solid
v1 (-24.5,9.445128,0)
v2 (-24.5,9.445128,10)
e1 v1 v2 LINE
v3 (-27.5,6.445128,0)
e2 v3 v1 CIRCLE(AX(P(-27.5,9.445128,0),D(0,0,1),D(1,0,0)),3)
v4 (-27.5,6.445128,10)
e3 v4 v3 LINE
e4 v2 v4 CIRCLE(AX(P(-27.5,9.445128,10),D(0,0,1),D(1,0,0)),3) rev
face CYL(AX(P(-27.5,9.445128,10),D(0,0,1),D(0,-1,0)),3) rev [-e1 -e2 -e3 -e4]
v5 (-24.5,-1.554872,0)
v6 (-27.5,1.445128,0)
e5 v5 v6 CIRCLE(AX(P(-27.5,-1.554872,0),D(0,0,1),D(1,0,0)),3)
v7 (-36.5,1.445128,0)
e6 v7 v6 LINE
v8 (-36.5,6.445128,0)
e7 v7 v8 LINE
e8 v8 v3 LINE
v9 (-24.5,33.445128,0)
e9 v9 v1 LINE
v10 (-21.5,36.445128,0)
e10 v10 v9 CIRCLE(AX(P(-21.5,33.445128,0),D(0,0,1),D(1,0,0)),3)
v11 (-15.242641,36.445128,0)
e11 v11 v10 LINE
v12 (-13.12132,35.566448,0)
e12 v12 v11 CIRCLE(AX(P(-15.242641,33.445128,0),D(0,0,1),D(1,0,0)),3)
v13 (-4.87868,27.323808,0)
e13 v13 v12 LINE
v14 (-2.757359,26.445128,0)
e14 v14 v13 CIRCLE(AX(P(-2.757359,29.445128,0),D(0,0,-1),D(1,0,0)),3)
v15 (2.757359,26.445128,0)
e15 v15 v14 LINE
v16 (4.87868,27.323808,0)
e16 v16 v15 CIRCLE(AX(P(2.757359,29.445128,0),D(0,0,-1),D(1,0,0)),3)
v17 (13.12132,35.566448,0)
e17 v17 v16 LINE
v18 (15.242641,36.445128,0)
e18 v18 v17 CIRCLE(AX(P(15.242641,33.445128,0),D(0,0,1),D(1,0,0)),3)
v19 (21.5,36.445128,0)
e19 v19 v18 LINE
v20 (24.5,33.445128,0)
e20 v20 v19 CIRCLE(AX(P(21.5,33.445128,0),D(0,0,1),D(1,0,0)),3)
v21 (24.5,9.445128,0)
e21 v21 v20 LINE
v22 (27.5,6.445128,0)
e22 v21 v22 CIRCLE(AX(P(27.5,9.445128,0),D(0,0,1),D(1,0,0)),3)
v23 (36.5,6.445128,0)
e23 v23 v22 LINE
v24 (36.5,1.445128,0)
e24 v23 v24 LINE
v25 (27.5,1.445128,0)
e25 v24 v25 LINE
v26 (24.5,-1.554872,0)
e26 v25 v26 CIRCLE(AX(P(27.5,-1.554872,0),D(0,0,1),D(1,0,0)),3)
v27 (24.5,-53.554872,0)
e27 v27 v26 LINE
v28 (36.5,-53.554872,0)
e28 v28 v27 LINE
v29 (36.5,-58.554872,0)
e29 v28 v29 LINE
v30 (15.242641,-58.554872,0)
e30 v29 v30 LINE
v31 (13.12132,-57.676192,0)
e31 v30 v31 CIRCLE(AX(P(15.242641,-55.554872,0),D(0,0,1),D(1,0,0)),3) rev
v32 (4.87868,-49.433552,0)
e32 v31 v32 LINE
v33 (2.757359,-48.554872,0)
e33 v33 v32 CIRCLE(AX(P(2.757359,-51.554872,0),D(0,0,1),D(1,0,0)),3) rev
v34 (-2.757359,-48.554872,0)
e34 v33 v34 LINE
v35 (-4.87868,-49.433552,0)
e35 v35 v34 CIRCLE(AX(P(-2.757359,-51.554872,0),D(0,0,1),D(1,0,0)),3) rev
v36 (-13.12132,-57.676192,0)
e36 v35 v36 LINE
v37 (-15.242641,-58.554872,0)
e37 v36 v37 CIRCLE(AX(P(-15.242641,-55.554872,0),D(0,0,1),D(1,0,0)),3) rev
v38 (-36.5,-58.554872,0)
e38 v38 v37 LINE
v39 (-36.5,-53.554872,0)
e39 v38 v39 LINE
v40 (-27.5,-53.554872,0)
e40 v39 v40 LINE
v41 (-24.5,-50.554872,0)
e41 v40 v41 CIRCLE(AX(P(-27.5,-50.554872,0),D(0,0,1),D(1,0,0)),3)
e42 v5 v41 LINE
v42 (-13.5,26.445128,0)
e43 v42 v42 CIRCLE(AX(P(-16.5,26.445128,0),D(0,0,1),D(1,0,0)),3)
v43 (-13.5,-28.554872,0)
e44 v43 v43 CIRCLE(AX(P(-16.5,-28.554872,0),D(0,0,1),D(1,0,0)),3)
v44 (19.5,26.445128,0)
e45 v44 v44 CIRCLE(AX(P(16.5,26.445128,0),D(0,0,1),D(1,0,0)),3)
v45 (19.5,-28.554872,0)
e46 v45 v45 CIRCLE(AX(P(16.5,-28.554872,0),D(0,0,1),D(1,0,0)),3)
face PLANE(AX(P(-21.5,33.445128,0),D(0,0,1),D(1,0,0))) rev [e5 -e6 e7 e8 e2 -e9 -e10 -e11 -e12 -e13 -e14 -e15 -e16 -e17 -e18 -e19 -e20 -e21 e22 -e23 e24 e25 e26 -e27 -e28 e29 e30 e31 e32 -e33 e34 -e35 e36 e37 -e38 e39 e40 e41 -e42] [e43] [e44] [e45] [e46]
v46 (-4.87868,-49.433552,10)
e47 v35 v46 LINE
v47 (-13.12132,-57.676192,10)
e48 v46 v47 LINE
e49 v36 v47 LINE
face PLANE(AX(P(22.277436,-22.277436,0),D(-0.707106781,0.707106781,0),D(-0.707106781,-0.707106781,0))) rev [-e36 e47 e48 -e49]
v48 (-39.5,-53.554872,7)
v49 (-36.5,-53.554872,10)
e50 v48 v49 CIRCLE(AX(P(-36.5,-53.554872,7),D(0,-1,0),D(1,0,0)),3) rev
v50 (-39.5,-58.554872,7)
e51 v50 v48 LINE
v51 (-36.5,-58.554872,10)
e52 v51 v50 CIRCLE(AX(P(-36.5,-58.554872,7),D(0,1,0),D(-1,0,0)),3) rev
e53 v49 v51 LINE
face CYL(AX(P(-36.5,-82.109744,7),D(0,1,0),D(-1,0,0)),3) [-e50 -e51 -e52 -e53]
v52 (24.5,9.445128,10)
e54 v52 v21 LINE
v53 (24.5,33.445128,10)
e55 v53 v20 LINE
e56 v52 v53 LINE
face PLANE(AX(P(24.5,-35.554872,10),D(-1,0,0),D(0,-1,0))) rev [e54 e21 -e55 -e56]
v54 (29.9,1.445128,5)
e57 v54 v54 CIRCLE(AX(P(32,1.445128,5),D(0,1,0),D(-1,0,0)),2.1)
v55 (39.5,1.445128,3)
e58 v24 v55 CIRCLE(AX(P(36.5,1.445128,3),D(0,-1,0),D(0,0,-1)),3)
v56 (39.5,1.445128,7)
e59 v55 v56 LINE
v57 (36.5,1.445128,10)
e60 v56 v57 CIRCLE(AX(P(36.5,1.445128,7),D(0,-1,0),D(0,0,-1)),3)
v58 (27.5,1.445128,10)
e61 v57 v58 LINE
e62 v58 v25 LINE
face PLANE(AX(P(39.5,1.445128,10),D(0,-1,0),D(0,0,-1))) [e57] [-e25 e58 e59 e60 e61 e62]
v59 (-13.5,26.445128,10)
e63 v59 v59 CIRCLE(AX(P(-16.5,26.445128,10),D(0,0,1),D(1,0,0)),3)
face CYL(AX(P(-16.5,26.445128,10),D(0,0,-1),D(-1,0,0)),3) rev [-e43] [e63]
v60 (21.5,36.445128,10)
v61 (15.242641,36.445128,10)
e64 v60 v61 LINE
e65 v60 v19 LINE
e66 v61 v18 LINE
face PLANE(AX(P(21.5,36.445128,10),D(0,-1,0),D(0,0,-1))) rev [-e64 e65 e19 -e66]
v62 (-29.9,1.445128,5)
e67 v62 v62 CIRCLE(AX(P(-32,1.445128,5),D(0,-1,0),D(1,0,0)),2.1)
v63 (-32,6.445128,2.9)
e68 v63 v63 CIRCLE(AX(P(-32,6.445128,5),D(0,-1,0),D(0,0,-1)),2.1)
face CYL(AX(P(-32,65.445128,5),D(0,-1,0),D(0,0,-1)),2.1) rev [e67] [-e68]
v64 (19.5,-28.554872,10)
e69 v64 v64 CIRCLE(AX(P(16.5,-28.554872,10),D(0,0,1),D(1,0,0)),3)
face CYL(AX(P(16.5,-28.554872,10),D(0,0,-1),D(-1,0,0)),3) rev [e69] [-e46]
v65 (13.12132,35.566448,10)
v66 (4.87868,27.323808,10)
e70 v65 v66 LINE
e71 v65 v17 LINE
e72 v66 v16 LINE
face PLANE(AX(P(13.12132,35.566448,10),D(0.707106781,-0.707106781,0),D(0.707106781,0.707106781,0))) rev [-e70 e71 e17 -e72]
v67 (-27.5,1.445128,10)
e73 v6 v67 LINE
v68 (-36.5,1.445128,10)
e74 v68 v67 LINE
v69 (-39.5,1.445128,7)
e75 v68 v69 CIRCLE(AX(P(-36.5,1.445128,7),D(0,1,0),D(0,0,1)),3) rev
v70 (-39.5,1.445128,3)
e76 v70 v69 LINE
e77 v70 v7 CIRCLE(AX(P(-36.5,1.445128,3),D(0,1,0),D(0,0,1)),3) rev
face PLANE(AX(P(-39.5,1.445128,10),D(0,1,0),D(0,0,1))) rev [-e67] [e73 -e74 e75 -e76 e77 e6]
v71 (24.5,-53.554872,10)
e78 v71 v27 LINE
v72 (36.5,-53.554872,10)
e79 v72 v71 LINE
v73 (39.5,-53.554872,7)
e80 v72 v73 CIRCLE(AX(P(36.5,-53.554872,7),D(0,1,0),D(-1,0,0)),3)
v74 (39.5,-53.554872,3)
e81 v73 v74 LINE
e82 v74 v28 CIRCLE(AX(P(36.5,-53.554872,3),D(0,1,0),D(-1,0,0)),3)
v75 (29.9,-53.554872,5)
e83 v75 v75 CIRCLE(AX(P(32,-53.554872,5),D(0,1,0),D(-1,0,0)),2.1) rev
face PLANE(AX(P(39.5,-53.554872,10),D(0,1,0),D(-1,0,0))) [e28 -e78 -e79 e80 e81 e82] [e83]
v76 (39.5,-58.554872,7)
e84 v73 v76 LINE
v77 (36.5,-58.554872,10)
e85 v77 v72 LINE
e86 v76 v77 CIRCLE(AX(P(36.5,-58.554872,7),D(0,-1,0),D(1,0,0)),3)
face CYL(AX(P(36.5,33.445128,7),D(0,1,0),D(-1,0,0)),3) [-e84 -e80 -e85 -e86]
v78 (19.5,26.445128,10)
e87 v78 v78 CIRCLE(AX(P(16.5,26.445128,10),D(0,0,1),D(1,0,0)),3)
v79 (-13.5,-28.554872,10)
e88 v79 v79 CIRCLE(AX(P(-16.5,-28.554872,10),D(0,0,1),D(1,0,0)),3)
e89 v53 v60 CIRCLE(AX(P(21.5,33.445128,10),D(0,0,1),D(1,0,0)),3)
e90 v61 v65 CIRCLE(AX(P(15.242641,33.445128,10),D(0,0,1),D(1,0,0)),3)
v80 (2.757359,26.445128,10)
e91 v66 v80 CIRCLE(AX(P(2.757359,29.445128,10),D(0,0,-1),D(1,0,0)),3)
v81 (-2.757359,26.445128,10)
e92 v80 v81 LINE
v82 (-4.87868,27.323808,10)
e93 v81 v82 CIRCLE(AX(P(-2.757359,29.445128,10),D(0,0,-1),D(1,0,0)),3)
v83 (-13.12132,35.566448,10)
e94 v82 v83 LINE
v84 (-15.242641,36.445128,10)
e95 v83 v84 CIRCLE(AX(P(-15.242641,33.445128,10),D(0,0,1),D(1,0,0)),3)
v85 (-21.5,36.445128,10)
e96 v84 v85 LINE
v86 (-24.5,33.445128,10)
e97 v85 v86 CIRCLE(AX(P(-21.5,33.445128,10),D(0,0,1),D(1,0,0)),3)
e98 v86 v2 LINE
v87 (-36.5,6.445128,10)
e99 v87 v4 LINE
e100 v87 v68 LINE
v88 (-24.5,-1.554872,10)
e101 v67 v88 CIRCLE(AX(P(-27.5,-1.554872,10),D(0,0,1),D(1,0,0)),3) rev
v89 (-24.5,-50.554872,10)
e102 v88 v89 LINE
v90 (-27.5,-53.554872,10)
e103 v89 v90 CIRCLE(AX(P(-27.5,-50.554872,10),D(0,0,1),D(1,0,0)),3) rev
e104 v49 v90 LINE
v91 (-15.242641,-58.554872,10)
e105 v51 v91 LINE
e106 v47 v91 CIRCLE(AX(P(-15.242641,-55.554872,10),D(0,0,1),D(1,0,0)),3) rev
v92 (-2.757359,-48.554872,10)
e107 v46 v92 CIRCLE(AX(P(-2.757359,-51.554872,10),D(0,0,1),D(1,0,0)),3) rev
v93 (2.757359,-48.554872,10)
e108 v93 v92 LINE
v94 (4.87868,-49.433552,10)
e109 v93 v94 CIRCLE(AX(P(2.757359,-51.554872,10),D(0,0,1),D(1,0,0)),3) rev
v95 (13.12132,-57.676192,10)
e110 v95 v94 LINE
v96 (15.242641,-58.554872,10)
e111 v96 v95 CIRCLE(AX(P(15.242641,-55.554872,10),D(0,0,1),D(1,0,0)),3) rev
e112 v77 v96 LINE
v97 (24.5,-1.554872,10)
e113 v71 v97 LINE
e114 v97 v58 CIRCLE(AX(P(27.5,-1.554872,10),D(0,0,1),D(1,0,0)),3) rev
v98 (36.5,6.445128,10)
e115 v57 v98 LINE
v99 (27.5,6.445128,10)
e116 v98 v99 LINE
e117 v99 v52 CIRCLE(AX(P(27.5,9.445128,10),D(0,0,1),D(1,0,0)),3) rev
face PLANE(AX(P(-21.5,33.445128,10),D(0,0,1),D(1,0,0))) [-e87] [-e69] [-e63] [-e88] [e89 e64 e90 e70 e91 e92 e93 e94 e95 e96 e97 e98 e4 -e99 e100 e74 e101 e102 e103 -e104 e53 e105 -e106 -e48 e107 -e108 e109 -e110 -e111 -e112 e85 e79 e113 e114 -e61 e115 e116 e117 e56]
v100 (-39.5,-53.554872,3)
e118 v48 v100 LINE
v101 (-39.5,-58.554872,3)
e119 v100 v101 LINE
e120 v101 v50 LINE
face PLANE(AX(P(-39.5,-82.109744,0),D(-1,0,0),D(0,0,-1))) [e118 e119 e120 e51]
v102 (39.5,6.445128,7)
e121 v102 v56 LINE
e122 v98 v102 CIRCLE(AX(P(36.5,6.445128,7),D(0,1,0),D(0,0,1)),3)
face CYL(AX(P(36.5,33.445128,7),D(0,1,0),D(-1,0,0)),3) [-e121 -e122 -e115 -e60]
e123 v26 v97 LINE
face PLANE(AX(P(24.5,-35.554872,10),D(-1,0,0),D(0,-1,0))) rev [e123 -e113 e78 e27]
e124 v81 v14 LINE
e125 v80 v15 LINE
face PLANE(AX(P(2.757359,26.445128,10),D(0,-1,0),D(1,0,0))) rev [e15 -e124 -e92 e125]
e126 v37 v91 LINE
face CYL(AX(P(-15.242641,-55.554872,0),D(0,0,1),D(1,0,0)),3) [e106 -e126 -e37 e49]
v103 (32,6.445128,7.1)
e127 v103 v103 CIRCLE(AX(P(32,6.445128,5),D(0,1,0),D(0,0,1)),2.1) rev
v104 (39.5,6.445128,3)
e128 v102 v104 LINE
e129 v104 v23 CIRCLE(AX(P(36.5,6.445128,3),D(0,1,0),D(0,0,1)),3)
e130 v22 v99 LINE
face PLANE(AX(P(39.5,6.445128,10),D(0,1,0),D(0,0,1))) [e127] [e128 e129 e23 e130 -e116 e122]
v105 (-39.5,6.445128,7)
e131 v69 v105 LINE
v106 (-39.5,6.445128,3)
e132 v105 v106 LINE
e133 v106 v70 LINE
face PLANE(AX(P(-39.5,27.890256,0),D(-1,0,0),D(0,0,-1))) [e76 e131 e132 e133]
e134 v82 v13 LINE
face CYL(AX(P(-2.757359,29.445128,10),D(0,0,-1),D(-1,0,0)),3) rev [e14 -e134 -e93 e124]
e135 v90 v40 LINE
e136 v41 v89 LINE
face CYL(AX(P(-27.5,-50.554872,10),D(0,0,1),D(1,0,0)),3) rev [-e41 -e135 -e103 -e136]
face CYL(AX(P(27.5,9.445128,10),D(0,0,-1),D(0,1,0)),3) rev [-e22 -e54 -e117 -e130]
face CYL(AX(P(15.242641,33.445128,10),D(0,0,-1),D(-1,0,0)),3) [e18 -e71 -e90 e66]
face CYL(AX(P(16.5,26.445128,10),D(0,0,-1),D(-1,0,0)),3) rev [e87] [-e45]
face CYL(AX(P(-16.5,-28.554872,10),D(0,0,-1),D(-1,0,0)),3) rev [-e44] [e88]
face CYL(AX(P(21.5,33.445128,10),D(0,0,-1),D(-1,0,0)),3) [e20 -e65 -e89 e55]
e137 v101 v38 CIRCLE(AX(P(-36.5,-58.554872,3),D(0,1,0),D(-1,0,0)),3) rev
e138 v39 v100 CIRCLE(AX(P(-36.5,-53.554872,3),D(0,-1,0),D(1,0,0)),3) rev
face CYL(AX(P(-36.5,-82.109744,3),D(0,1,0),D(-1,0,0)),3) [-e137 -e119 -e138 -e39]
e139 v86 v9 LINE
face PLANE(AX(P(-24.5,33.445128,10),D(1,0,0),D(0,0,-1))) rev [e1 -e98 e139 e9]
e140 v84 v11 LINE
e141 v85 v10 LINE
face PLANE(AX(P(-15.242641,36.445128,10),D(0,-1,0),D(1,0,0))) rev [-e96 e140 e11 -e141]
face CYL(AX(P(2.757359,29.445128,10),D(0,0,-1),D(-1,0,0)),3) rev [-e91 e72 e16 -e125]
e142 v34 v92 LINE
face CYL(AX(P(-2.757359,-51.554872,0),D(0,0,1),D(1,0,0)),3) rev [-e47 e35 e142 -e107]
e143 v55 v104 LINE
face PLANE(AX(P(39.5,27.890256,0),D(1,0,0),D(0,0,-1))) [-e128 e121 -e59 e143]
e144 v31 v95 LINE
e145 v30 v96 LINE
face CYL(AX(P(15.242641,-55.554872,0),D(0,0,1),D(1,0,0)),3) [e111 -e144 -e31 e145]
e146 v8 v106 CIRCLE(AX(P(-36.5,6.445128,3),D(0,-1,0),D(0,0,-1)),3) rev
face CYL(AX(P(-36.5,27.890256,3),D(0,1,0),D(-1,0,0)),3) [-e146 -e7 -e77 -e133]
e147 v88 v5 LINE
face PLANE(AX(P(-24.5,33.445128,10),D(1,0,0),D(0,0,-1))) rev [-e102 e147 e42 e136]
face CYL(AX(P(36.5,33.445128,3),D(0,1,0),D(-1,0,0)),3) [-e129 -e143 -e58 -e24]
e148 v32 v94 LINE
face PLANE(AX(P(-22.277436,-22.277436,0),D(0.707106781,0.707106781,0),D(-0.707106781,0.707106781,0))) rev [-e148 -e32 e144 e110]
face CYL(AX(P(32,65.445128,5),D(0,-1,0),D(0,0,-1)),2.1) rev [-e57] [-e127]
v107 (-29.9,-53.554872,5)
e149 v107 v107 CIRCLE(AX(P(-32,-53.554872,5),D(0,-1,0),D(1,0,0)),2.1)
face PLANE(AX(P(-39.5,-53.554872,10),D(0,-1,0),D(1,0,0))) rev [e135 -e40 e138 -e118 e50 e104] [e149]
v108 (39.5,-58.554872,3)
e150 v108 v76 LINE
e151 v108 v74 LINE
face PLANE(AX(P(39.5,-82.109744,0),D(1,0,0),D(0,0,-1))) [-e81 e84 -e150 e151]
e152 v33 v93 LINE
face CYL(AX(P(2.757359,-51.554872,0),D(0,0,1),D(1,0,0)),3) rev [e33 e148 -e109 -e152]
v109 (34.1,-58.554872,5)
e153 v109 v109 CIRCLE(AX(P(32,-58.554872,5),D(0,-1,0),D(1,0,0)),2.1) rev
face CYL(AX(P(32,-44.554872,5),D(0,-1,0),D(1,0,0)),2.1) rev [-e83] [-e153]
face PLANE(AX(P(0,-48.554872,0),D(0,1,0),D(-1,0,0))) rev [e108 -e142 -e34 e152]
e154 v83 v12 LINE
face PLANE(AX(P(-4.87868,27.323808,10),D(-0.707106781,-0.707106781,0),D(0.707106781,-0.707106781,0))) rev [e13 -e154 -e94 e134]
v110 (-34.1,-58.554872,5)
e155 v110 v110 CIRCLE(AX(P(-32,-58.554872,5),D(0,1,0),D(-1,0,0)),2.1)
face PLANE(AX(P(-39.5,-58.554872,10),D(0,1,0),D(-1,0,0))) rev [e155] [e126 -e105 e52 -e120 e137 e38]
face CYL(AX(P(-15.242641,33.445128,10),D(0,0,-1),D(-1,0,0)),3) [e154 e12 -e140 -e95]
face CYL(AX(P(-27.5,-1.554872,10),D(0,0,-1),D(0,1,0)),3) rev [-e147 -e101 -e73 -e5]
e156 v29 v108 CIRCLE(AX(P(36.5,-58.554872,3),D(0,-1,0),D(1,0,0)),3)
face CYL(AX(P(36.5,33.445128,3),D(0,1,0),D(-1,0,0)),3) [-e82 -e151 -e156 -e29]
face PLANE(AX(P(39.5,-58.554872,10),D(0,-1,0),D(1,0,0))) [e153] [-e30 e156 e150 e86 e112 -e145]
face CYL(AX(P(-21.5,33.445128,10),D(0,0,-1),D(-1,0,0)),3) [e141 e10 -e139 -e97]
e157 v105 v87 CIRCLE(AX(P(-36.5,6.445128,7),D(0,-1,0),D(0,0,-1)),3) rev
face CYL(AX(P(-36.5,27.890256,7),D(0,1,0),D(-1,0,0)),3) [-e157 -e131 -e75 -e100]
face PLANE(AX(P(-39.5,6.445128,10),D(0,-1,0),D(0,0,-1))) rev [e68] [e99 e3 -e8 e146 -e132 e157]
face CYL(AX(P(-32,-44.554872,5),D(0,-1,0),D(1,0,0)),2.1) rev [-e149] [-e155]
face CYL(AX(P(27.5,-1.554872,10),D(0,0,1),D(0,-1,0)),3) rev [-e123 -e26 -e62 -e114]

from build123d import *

# Parameters (mm, degrees)
SKETCH1_R           = 3
BOSS_EXTRUDE1_DEPTH = 10
SKETCH2_W           = 10
SKETCH2_H           = 5
BOSS_EXTRUDE2_DEPTH = 15
SKETCH3_R           = 2.1
CUT_EXTRUDE1_DEPTH  = 64
FILLET1_R           = 3
BOSS_EXTRUDE3_START = -10
BOSS_EXTRUDE3_DEPTH = 10
MIRROR3_START       = -58.554872108
MIRROR3_OUTLINE_W   = 15
MIRROR3_OUTLINE_H   = 10
MIRROR3_OUTLINE_R   = 2.1
MIRROR3_DEPTH       = 5
MIRROR3_2_DEPTH     = 10
FILLET2_R           = 3
SKETCH5_W           = 15
SKETCH5_H           = 11
CUT_EXTRUDE2_DEPTH  = 80.749736613
FILLET3_R           = 3
MIRROR4_START       = 1.445127892
MIRROR4_OUTLINE_R   = 2.1
MIRROR4_DEPTH       = 5
MIRROR4_2_DEPTH     = 10
FILLET4_R           = 3
SKETCH6_W           = 15
SKETCH6_H           = 11
CUT_EXTRUDE3_DEPTH  = 80.749736613
CUT_EXTRUDE4_DEPTH  = 80.749736613


with BuildPart() as part:
    # Sketch1 → Boss-Extrude1 (new body)
    with BuildSketch(Plane.XY):
        with BuildLine():
            Line((-24.5, 33.445127892), (-24.5, -35.554872108))
            ThreePointArc((-24.5, -35.554872108), (-23.621320344, -37.676192452), (-21.5, -38.554872108))
            Line((-21.5, -38.554872108), (-15.242640687, -38.554872108))
            ThreePointArc((-15.242640687, -38.554872108), (-14.09459039, -38.326510706), (-13.121320344, -37.676192452))
            Line((-13.121320344, -37.676192452), (-4.878679656, -29.433551765))
            ThreePointArc((-4.878679656, -29.433551765), (-3.90540961, -28.783233511), (-2.757359313, -28.554872108))
            Line((-2.757359313, -28.554872108), (2.757359313, -28.554872108))
            ThreePointArc((2.757359313, -28.554872108), (3.90540961, -28.783233511), (4.878679656, -29.433551765))
            Line((4.878679656, -29.433551765), (13.121320344, -37.676192452))
            ThreePointArc((13.121320344, -37.676192452), (14.09459039, -38.326510706), (15.242640687, -38.554872108))
            Line((15.242640687, -38.554872108), (21.5, -38.554872108))
            ThreePointArc((21.5, -38.554872108), (23.621320344, -37.676192452), (24.5, -35.554872108))
            Line((24.5, -35.554872108), (24.5, 33.445127892))
            ThreePointArc((24.5, 33.445127892), (23.621320344, 35.566448235), (21.5, 36.445127892))
            Line((21.5, 36.445127892), (15.242640687, 36.445127892))
            ThreePointArc((15.242640687, 36.445127892), (14.09459039, 36.216766489), (13.121320344, 35.566448235))
            Line((13.121320344, 35.566448235), (4.878679656, 27.323807548))
            ThreePointArc((4.878679656, 27.323807548), (3.90540961, 26.673489294), (2.757359313, 26.445127892))
            Line((2.757359313, 26.445127892), (-2.757359313, 26.445127892))
            ThreePointArc((-2.757359313, 26.445127892), (-3.90540961, 26.673489294), (-4.878679656, 27.323807548))
            Line((-4.878679656, 27.323807548), (-13.121320344, 35.566448235))
            ThreePointArc((-13.121320344, 35.566448235), (-14.09459039, 36.216766489), (-15.242640687, 36.445127892))
            Line((-15.242640687, 36.445127892), (-21.5, 36.445127892))
            ThreePointArc((-21.5, 36.445127892), (-23.621320344, 35.566448235), (-24.5, 33.445127892))
        make_face()
        with Locations((16.5, -28.554872108)):
            Circle(SKETCH1_R, mode=Mode.SUBTRACT)
        with Locations((-16.5, -28.554872108)):
            Circle(SKETCH1_R, mode=Mode.SUBTRACT)
        with Locations((16.5, 26.445127892)):
            Circle(SKETCH1_R, mode=Mode.SUBTRACT)
        with Locations((-16.5, 26.445127892)):
            Circle(SKETCH1_R, mode=Mode.SUBTRACT)
    extrude(amount=BOSS_EXTRUDE1_DEPTH)

    # Sketch2 → Boss-Extrude2 (add)
    with BuildSketch(Plane(origin=(24.5, 0, 0), x_dir=(0, 0, -1), z_dir=(1, 0, 0))):
        with Locations((-5, 23.945127892)):
            Rectangle(SKETCH2_W, SKETCH2_H)
        with Locations((-5, -26.054872108)):
            Rectangle(SKETCH2_W, SKETCH2_H)
    boss_extrude2 = extrude(amount=BOSS_EXTRUDE2_DEPTH)

    # Sketch3 → Cut-Extrude1 (cut)
    with BuildSketch(Plane(origin=(0, 26.445127892, 0), x_dir=(1, 0, 0), z_dir=(0, 1, 0))):
        with Locations(Location((32, -5, 0), (0, 0, 180))):
            Circle(SKETCH3_R)
    cut_extrude1 = extrude(amount=-CUT_EXTRUDE1_DEPTH, mode=Mode.SUBTRACT)

    # Mirror1: Boss-Extrude2, Cut-Extrude1 across plane
    add(boss_extrude2.mirror(Plane(origin=(0, 0, 0), x_dir=(0, 0, 1), z_dir=(1, 0, 0))))
    add(cut_extrude1.mirror(Plane(origin=(0, 0, 0), x_dir=(0, 0, 1), z_dir=(1, 0, 0))), mode=Mode.SUBTRACT)

    # Fillet1
    fillet1_edges = [part.edges().sort_by_distance(p)[0] for p in [
        (-39.5, 23.945127892, 10),
        (-39.5, 23.945127892, 0),
        (-24.5, 21.445127892, 5),
        (-24.5, 26.445127892, 5),
        (-39.5, -26.054872108, 10),
        (-39.5, -26.054872108, 0),
        (-24.5, -28.554872108, 5),
        (-24.5, -23.554872108, 5),
        (24.5, 21.445127892, 5),
        (24.5, 26.445127892, 5),
        (39.5, 23.945127892, 10),
        (39.5, 23.945127892, 0),
        (24.5, -28.554872108, 5),
        (24.5, -23.554872108, 5),
        (39.5, -26.054872108, 10),
        (39.5, -26.054872108, 0),
    ]]
    fillet(fillet1_edges, radius=FILLET1_R)

    # Sketch4 → Boss-Extrude3 (add)
    with BuildSketch(Plane.XY.offset(10).offset(BOSS_EXTRUDE3_START)):
        with BuildLine():
            ThreePointArc((15.242640687, -68.554872108), (14.09459039, -68.326510706), (13.121320344, -67.676192452))
            Line((13.121320344, -67.676192452), (4.878679656, -59.433551765))
            ThreePointArc((4.878679656, -59.433551765), (3.90540961, -58.783233511), (2.757359313, -58.554872108))
            Line((2.757359313, -58.554872108), (-2.757359313, -58.554872108))
            ThreePointArc((-2.757359313, -58.554872108), (-3.90540961, -58.783233511), (-4.878679656, -59.433551765))
            Line((-4.878679656, -59.433551765), (-13.121320344, -67.676192452))
            ThreePointArc((-13.121320344, -67.676192452), (-14.09459039, -68.326510706), (-15.242640687, -68.554872108))
            Line((-15.242640687, -68.554872108), (-24.5, -68.554872108))
            Line((-24.5, -68.554872108), (-24.5, -38.554872108))
            Line((-24.5, -38.554872108), (-24.5, -35.554872108))
            ThreePointArc((-24.5, -35.554872108), (-23.621320344, -37.676192452), (-21.5, -38.554872108))
            Line((-21.5, -38.554872108), (-15.242640687, -38.554872108))
            ThreePointArc((-15.242640687, -38.554872108), (-14.09459039, -38.326510706), (-13.121320344, -37.676192452))
            Line((-13.121320344, -37.676192452), (-4.878679656, -29.433551765))
            ThreePointArc((-4.878679656, -29.433551765), (-3.90540961, -28.783233511), (-2.757359313, -28.554872108))
            Line((-2.757359313, -28.554872108), (2.757359313, -28.554872108))
            ThreePointArc((2.757359313, -28.554872108), (3.90540961, -28.783233511), (4.878679656, -29.433551765))
            Line((4.878679656, -29.433551765), (13.121320344, -37.676192452))
            ThreePointArc((13.121320344, -37.676192452), (14.09459039, -38.326510706), (15.242640687, -38.554872108))
            Line((15.242640687, -38.554872108), (21.5, -38.554872108))
            ThreePointArc((21.5, -38.554872108), (23.621320344, -37.676192452), (24.5, -35.554872108))
            Line((24.5, -35.554872108), (24.5, -38.554872108))
            Line((24.5, -38.554872108), (24.5, -68.554872108))
            Line((24.5, -68.554872108), (15.242640687, -68.554872108))
        make_face()
    extrude(amount=BOSS_EXTRUDE3_DEPTH)

    # Mirror3: read off the stored shape, not the designer's step
    # Mirror3 outline → Mirror3 (add)
    # profile 1 of 2: a face of its own
    with BuildSketch(Plane(origin=(0, 0, 0), x_dir=(1, 0, 0), z_dir=(0, 1, 0)).offset(MIRROR3_START)):
        with Locations((32, -5)):
            Rectangle(MIRROR3_OUTLINE_W, MIRROR3_OUTLINE_H)
        with Locations((32, -5)):
            Circle(MIRROR3_OUTLINE_R, mode=Mode.SUBTRACT)
    # profile 2 of 2: a face of its own
    with BuildSketch(Plane(origin=(0, 0, 0), x_dir=(1, 0, 0), z_dir=(0, 1, 0)).offset(MIRROR3_START)):
        with Locations((-32, -5)):
            Rectangle(MIRROR3_OUTLINE_W, MIRROR3_OUTLINE_H)
        with Locations((-32, -5)):
            Circle(MIRROR3_OUTLINE_R, mode=Mode.SUBTRACT)
    extrude(amount=MIRROR3_DEPTH)

    # Mirror3 2 outline → Mirror3 2 (add)
    with BuildSketch(Plane.XY):
        with BuildLine():
            ThreePointArc((-24.5, -50.554872108), (-25.378679656, -52.676192452), (-27.5, -53.554872108))
            Line((-27.5, -53.554872108), (-24.5, -53.554872108))
            Line((-24.5, -53.554872108), (-24.5, -50.554872108))
        make_face()
        with BuildLine():
            Line((-24.5, -58.554872108), (-27.5, -58.554872108))
            ThreePointArc((-27.5, -58.554872108), (-25.378679657, -59.433551764), (-24.5, -61.554872108))
            Line((-24.5, -61.554872108), (-24.5, -58.554872108))
        make_face()
    extrude(amount=MIRROR3_2_DEPTH)

    # Fillet2
    fillet2_edges = [part.edges().sort_by_distance(p)[0] for p in [
        (-39.5, -56.054872108, 10),
        (-39.5, -56.054872108, 0),
        (39.5, -56.054872108, 10),
        (39.5, -56.054872108, 0),
    ]]
    fillet(fillet2_edges, radius=FILLET2_R)

    # Sketch5 → Cut-Extrude2 (cut, through all)
    with BuildSketch(Plane.XY.offset(10)):
        with Locations((-32, -26.054872108)):
            Rectangle(SKETCH5_W, SKETCH5_H)
        with Locations((32, -26.054872108)):
            Rectangle(SKETCH5_W, SKETCH5_H)
    extrude(amount=-CUT_EXTRUDE2_DEPTH, mode=Mode.SUBTRACT)

    # Fillet3
    fillet3_edges = [part.edges().sort_by_distance(p)[0] for p in [
        (-24.5, -68.554872108, 5),
        (24.5, -68.554872108, 5),
    ]]
    fillet(fillet3_edges, radius=FILLET3_R)

    # Mirror4: read off the stored shape, not the designer's step
    # Mirror4 outline → Mirror4 (add)
    with BuildSketch(Plane(origin=(0, 0, 0), x_dir=(1, 0, 0), z_dir=(0, 1, 0)).offset(MIRROR4_START)):
        with BuildLine():
            ThreePointArc((-39.5, -7), (-38.621320344, -9.121320344), (-36.5, -10))
            Line((-36.5, -10), (39.5, -10))
            Line((39.5, -10), (39.5, 0))
            Line((39.5, 0), (-36.5, 0))
            ThreePointArc((-36.5, 0), (-38.621320344, -0.878679656), (-39.5, -3))
            Line((-39.5, -3), (-39.5, -7))
        make_face()
        with Locations((-32, -5)):
            Circle(MIRROR4_OUTLINE_R, mode=Mode.SUBTRACT)
        with Locations((32, -5)):
            Circle(MIRROR4_OUTLINE_R, mode=Mode.SUBTRACT)
    extrude(amount=MIRROR4_DEPTH)

    # Mirror4 2 outline → Mirror4 2 (add)
    with BuildSketch(Plane.XY):
        with BuildLine():
            ThreePointArc((-24.5, 9.445127892), (-25.378679656, 7.323807548), (-27.5, 6.445127892))
            Line((-27.5, 6.445127892), (-24.5, 6.445127892))
            Line((-24.5, 6.445127892), (-24.5, 9.445127892))
        make_face()
        with BuildLine():
            Line((-24.5, 1.445127892), (-27.5, 1.445127892))
            ThreePointArc((-27.5, 1.445127892), (-25.378679657, 0.566448236), (-24.5, -1.554872108))
            Line((-24.5, -1.554872108), (-24.5, 1.445127892))
        make_face()
    extrude(amount=MIRROR4_2_DEPTH)

    # Fillet4
    fillet4_edges = [part.edges().sort_by_distance(p)[0] for p in [
        (39.5, 3.945127892, 10),
        (39.5, 3.945127892, 0),
        (24.5, 6.445127892, 5),
        (24.5, 1.445127892, 5),
    ]]
    fillet(fillet4_edges, radius=FILLET4_R)

    # Sketch6 → Cut-Extrude3 (cut, through all)
    with BuildSketch(Plane.XY.offset(10)):
        with Locations((-32, 23.945127892)):
            Rectangle(SKETCH6_W, SKETCH6_H)
        with Locations((32, 23.945127892)):
            Rectangle(SKETCH6_W, SKETCH6_H)
    extrude(amount=-CUT_EXTRUDE3_DEPTH, mode=Mode.SUBTRACT)

    # Sketch7 → Cut-Extrude4 (cut, through all)
    with BuildSketch(Plane.XY.offset(10)):
        with BuildLine():
            Line((15.242640687, -58.554872108), (24.5, -58.554872108))
            Line((24.5, -58.554872108), (24.5, -65.554872108))
            ThreePointArc((24.5, -65.554872108), (23.621320344, -67.676192452), (21.5, -68.554872108))
            Line((21.5, -68.554872108), (15.242640687, -68.554872108))
            ThreePointArc((15.242640687, -68.554872108), (14.09459039, -68.326510706), (13.121320344, -67.676192452))
            Line((13.121320344, -67.676192452), (4.878679656, -59.433551765))
            ThreePointArc((4.878679656, -59.433551765), (3.90540961, -58.783233511), (2.757359313, -58.554872108))
            Line((2.757359313, -58.554872108), (-2.757359313, -58.554872108))
            ThreePointArc((-2.757359313, -58.554872108), (-3.90540961, -58.783233511), (-4.878679656, -59.433551765))
            Line((-4.878679656, -59.433551765), (-13.121320344, -67.676192452))
            ThreePointArc((-13.121320344, -67.676192452), (-14.09459039, -68.326510706), (-15.242640687, -68.554872108))
            Line((-15.242640687, -68.554872108), (-21.5, -68.554872108))
            ThreePointArc((-21.5, -68.554872108), (-23.621320344, -67.676192452), (-24.5, -65.554872108))
            Line((-24.5, -65.554872108), (-24.5, -61.554872108))
            ThreePointArc((-24.5, -61.554872108), (-25.378679656, -59.433551765), (-27.5, -58.554872108))
            Line((-27.5, -58.554872108), (-15.242640687, -58.554872108))
            ThreePointArc((-15.242640687, -58.554872108), (-14.09459039, -58.326510706), (-13.121320344, -57.676192452))
            Line((-13.121320344, -57.676192452), (-4.878679656, -49.433551765))
            ThreePointArc((-4.878679656, -49.433551765), (-3.90540961, -48.783233511), (-2.757359313, -48.554872108))
            Line((-2.757359313, -48.554872108), (2.757359313, -48.554872108))
            ThreePointArc((2.757359313, -48.554872108), (3.90540961, -48.783233511), (4.878679656, -49.433551765))
            Line((4.878679656, -49.433551765), (13.121320344, -57.676192452))
            ThreePointArc((13.121320344, -57.676192452), (14.09459039, -58.326510706), (15.242640687, -58.554872108))
        make_face()
    extrude(amount=-CUT_EXTRUDE4_DEPTH, mode=Mode.SUBTRACT)


solid = part.part
